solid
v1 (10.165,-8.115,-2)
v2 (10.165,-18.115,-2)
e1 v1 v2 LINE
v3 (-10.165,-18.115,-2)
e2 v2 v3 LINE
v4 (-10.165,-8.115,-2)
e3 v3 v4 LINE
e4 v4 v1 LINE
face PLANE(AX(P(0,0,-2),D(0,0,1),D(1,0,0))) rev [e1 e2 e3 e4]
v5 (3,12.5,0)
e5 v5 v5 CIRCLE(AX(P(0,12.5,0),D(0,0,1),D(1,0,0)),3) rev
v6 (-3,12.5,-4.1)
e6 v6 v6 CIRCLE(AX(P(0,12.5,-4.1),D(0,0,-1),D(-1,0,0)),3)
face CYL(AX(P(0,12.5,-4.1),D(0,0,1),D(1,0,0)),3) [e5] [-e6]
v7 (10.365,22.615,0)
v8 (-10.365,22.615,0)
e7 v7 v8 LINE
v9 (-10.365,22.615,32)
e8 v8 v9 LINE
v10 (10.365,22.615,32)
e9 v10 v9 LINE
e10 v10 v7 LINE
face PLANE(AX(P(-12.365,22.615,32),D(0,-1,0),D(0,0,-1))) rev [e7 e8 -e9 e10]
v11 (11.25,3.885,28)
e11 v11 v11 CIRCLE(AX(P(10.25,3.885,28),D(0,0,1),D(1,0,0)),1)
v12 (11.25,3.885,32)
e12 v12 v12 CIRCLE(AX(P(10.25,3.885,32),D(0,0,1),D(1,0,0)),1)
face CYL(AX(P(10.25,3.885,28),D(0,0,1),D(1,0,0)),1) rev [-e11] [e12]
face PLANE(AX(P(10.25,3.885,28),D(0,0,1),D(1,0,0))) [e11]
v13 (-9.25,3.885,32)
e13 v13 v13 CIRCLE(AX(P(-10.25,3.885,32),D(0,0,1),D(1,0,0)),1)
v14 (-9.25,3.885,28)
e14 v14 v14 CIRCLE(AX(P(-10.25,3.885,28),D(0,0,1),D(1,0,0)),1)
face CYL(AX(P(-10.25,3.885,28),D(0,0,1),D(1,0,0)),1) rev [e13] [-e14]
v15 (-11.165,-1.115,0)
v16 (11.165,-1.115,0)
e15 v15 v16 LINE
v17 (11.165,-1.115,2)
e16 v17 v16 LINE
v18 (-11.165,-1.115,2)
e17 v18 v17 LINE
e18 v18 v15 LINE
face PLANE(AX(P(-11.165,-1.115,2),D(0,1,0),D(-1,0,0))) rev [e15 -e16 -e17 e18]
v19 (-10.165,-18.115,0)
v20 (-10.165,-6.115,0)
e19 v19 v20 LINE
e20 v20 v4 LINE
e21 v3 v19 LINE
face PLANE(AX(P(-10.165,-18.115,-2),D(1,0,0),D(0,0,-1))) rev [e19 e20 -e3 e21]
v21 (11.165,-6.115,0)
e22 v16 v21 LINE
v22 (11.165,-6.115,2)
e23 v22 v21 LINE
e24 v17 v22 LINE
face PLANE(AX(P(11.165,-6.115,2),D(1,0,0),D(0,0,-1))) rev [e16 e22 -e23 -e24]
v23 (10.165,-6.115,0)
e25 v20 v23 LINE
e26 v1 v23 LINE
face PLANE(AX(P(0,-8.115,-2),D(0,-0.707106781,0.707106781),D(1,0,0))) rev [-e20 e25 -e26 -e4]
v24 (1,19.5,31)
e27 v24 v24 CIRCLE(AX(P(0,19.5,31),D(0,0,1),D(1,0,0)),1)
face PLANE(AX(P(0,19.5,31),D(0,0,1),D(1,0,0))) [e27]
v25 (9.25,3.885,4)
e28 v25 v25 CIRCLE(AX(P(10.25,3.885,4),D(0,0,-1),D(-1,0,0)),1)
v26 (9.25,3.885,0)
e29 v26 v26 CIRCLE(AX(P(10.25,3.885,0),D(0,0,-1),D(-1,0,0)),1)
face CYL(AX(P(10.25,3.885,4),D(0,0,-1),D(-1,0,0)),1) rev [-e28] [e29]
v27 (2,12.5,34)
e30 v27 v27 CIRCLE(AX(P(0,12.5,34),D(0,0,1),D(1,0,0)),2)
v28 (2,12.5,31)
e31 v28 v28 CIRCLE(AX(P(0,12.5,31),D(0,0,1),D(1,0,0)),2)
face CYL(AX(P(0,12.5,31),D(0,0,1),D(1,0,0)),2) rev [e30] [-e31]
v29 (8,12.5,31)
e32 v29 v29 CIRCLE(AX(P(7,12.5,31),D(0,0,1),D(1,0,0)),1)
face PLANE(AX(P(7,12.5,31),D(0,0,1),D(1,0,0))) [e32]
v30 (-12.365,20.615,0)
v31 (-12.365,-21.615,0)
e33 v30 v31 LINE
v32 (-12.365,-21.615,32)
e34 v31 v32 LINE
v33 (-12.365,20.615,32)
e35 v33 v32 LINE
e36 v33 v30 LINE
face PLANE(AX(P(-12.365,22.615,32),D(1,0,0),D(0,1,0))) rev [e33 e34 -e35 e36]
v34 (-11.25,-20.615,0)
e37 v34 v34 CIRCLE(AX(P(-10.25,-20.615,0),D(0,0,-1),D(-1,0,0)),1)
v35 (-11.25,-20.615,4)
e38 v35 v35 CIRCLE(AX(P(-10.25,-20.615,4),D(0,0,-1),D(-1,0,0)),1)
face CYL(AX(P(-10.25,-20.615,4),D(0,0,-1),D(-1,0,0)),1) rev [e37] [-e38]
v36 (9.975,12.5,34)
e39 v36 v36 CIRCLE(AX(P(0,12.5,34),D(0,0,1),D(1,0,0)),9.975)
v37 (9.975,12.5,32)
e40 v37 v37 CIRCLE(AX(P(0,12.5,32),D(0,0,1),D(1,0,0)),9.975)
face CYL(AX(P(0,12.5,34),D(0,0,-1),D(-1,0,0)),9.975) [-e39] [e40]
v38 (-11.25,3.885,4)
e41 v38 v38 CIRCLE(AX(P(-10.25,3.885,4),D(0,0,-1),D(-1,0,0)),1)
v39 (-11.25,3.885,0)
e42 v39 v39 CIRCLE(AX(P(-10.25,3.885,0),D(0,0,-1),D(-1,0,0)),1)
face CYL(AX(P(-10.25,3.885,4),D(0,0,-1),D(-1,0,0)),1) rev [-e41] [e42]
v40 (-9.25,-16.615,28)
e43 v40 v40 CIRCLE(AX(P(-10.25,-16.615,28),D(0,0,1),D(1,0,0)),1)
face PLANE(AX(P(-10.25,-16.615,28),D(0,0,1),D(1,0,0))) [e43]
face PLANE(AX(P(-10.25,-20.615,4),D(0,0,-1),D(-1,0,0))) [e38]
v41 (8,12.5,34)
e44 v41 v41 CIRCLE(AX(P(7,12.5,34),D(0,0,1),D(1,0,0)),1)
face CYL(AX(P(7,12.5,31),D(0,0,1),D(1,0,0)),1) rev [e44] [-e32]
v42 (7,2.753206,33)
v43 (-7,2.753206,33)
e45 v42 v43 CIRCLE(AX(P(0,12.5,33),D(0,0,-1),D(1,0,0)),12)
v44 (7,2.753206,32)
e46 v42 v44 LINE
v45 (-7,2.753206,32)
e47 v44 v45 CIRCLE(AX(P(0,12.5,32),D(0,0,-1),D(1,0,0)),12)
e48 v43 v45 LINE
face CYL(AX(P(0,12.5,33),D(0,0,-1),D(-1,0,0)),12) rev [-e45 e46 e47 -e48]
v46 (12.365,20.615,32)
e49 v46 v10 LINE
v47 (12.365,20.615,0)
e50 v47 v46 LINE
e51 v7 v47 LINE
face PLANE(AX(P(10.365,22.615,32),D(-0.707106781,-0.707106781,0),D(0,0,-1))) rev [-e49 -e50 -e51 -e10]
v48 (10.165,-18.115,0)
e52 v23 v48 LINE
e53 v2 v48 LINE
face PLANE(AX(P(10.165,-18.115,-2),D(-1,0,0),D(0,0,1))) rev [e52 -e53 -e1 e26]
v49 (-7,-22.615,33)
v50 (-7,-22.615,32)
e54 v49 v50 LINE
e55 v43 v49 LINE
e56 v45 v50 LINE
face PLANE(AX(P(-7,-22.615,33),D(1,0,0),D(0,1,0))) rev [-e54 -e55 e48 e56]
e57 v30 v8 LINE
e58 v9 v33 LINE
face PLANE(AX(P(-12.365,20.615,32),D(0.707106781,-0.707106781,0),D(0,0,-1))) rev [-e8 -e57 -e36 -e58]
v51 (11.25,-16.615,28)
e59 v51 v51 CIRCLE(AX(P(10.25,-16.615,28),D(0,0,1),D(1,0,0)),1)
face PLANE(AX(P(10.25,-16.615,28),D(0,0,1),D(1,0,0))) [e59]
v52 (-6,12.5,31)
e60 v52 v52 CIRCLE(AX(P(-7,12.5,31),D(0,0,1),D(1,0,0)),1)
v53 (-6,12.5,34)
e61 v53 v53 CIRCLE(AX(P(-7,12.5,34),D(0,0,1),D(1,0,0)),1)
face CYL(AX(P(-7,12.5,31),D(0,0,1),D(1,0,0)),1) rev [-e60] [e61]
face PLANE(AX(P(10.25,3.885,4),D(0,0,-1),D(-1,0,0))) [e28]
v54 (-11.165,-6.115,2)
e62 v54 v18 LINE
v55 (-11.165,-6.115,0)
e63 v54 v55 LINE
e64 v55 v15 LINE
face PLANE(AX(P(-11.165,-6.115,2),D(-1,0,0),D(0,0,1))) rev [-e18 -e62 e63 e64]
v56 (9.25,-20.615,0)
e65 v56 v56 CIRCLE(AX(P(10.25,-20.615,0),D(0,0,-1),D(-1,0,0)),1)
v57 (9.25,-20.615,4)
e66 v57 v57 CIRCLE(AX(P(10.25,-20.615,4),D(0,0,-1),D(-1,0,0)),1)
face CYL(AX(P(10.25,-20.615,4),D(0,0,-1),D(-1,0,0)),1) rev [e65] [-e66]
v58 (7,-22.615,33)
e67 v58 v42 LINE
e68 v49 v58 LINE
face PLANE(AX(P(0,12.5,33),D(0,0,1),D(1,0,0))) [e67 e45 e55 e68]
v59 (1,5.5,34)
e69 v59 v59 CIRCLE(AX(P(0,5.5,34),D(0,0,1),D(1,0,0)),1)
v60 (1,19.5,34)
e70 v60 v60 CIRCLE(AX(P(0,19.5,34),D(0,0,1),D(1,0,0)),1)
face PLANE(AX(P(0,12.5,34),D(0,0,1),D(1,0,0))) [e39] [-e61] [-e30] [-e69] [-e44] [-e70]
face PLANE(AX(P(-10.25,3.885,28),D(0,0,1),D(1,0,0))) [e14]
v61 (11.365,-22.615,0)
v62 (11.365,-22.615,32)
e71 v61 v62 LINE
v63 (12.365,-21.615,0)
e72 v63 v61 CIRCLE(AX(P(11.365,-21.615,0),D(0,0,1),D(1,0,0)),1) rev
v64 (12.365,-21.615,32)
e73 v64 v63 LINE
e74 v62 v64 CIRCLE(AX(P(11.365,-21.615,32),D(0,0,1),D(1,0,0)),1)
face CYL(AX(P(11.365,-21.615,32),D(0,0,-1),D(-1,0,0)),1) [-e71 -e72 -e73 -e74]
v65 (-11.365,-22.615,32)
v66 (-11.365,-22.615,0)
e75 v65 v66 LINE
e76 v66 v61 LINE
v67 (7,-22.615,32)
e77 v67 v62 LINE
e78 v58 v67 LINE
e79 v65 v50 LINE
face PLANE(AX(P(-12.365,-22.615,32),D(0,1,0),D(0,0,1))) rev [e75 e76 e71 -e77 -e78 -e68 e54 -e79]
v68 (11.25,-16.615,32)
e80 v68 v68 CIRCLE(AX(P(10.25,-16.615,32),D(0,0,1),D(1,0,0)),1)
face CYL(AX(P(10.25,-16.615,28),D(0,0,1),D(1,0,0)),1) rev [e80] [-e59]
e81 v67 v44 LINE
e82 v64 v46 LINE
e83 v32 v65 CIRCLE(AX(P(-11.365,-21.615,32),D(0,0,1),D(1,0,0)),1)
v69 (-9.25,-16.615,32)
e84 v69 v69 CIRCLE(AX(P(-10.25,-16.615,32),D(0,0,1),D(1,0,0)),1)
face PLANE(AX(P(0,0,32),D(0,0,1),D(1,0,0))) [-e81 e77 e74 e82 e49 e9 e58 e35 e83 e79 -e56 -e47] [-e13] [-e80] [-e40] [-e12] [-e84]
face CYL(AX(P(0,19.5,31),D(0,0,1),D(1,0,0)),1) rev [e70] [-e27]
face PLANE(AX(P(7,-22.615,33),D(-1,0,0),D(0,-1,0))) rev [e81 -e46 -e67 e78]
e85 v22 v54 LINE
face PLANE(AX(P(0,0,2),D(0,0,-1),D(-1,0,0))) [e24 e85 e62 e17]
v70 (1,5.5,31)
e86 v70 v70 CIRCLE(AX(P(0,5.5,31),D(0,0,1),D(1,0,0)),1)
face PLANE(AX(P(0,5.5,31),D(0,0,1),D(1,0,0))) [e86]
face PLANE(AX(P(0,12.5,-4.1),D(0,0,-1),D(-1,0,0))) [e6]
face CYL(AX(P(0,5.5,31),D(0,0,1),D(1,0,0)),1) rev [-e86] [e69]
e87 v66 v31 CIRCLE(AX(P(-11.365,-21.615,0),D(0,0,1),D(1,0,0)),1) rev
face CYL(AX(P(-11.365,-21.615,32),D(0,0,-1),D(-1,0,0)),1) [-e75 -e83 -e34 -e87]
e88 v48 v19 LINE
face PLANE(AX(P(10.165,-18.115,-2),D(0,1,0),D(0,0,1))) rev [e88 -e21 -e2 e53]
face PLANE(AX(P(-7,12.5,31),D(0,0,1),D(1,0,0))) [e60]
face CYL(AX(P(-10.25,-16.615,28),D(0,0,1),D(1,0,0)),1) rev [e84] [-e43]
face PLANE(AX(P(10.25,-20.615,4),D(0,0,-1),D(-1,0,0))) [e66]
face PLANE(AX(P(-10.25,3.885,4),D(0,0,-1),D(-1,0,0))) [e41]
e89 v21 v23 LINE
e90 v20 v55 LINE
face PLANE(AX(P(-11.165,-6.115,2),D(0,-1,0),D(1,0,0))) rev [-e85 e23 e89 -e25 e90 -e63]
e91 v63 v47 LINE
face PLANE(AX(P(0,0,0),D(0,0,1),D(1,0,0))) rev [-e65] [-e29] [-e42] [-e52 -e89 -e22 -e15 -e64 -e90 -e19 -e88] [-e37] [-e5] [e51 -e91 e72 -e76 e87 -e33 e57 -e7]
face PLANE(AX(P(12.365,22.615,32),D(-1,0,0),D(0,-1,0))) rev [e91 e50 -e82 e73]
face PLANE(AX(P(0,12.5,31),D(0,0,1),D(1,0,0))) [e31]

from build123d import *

# Parameters (mm, degrees)
SKETCH_1_W          = 24.73
SKETCH_1_H          = 45.23
EXTRUDE_1_DEPTH     = 32
CHAMFER_1_SIZE      = 2
EXTRUDE_2_DEPTH     = 1
SKETCH_3_R          = 1
CUT_EXTRUDE_1_DEPTH = 4
SKETCH_4_R          = 9.975
EXTRUDE_3_DEPTH     = 2
SKETCH_5_R          = 2
SKETCH_5_R_2        = 1
CUT_EXTRUDE_2_DEPTH = 3
SKETCH_6_W          = 20.33
SKETCH_6_H          = 12
EXTRUDE_4_DEPTH     = 2
CHAMFER_2_SIZE      = 2
SKETCH_7_W          = 22.33
SKETCH_7_H          = 5
CUT_EXTRUDE_3_DEPTH = 2
SKETCH_8_R          = 3
EXTRUDE_5_DEPTH     = 4.1
CUT_EXTRUDE_START   = -4
SKETCH_9_R          = 1
CUT_EXTRUDE_4_DEPTH = 4
FILLET_1_R          = 1


with BuildPart() as part:
    # 스케치1 → 보스-돌출1 (new body)
    with BuildSketch(Plane.XY):
        Rectangle(SKETCH_1_W, SKETCH_1_H)
    extrude(amount=EXTRUDE_1_DEPTH)

    # 모따기1
    chamfer_1_edges = [part.edges().sort_by_distance(p)[0] for p in [
        (-12.365, 22.615, 16),
        (12.365, 22.615, 16),
    ]]
    chamfer(chamfer_1_edges, length=CHAMFER_1_SIZE)

    # 스케치2 → 보스-돌출2 (add)
    with BuildSketch(Plane.XY.offset(32)):
        with BuildLine():
            Line((-7, -22.615), (7, -22.615))
            Line((7, -22.615), (7, 2.753205655))
            ThreePointArc((7, 2.753205655), (0, 0.5), (-7, 2.753205655))
            Line((-7, 2.753205655), (-7, -22.615))
        make_face()
    extrude(amount=EXTRUDE_2_DEPTH)

    # 스케치3 → 컷-돌출1 (cut)
    with BuildSketch(Plane.XY.offset(32)):
        with Locations((-10.25, 3.885)):
            Circle(SKETCH_3_R)
        with Locations((-10.25, -16.615)):
            Circle(SKETCH_3_R)
        with Locations((10.25, -16.615)):
            Circle(SKETCH_3_R)
        with Locations((10.25, 3.885)):
            Circle(SKETCH_3_R)
    extrude(amount=-CUT_EXTRUDE_1_DEPTH, mode=Mode.SUBTRACT)

    # 스케치4 → 보스-돌출3 (add)
    with BuildSketch(Plane.XY.offset(32)):
        with Locations((0, 12.5)):
            Circle(SKETCH_4_R)
    extrude(amount=EXTRUDE_3_DEPTH)

    # 스케치5 → 컷-돌출2 (cut)
    with BuildSketch(Plane.XY.offset(34)):
        with Locations((0, 12.5)):
            Circle(SKETCH_5_R)
        with Locations((0, 19.5)):
            Circle(SKETCH_5_R_2)
        with Locations((7, 12.5)):
            Circle(SKETCH_5_R_2)
        with Locations((0, 5.5)):
            Circle(SKETCH_5_R_2)
        with Locations((-7, 12.5)):
            Circle(SKETCH_5_R_2)
    extrude(amount=-CUT_EXTRUDE_2_DEPTH, mode=Mode.SUBTRACT)

    # 스케치6 → 보스-돌출4 (add)
    with BuildSketch(Plane(origin=(0, 0, 0), x_dir=(-1, 0, 0), z_dir=(0, 0, -1))):
        with Locations((0, -12.115)):
            Rectangle(SKETCH_6_W, SKETCH_6_H)
    extrude(amount=EXTRUDE_4_DEPTH)

    # 모따기2
    chamfer_2_edges = [part.edges().sort_by_distance(p)[0] for p in [
        (0, -6.115, -2),
    ]]
    chamfer(chamfer_2_edges, length=CHAMFER_2_SIZE - 0.0001)  # a hair under: the kernel refuses the full size

    # 스케치7 → 컷-돌출3 (cut)
    with BuildSketch(Plane(origin=(0, 0, 0), x_dir=(-1, 0, 0), z_dir=(0, 0, -1))):
        with Locations((0, -3.615)):
            Rectangle(SKETCH_7_W, SKETCH_7_H)
    extrude(amount=-CUT_EXTRUDE_3_DEPTH, mode=Mode.SUBTRACT)

    # 스케치8 → 보스-돌출5 (add)
    with BuildSketch(Plane(origin=(0, 0, 0), x_dir=(-1, 0, 0), z_dir=(0, 0, -1))):
        with Locations(Location((0, 12.5, 0), (0, 0, 180))):
            Circle(SKETCH_8_R)
    extrude(amount=EXTRUDE_5_DEPTH)

    # 스케치9 → 컷-돌출4 (cut)
    with BuildSketch(Plane(origin=(0, 0, 0), x_dir=(-1, 0, 0), z_dir=(0, 0, -1)).offset(CUT_EXTRUDE_START)):
        with Locations(Location((-10.25, 3.885, 0), (0, 0, 180))):
            Circle(SKETCH_9_R)
        with Locations(Location((10.25, 3.885, 0), (0, 0, 180))):
            Circle(SKETCH_9_R)
        with Locations((-10.25, -20.615)):
            Circle(SKETCH_9_R)
        with Locations((10.25, -20.615)):
            Circle(SKETCH_9_R)
    extrude(amount=CUT_EXTRUDE_4_DEPTH, mode=Mode.SUBTRACT)

    # 필렛1
    fillet_1_edges = [part.edges().sort_by_distance(p)[0] for p in [
        (12.365, -22.615, 16),
        (-12.365, -22.615, 16),
    ]]
    fillet(fillet_1_edges, radius=FILLET_1_R)


solid = part.part
